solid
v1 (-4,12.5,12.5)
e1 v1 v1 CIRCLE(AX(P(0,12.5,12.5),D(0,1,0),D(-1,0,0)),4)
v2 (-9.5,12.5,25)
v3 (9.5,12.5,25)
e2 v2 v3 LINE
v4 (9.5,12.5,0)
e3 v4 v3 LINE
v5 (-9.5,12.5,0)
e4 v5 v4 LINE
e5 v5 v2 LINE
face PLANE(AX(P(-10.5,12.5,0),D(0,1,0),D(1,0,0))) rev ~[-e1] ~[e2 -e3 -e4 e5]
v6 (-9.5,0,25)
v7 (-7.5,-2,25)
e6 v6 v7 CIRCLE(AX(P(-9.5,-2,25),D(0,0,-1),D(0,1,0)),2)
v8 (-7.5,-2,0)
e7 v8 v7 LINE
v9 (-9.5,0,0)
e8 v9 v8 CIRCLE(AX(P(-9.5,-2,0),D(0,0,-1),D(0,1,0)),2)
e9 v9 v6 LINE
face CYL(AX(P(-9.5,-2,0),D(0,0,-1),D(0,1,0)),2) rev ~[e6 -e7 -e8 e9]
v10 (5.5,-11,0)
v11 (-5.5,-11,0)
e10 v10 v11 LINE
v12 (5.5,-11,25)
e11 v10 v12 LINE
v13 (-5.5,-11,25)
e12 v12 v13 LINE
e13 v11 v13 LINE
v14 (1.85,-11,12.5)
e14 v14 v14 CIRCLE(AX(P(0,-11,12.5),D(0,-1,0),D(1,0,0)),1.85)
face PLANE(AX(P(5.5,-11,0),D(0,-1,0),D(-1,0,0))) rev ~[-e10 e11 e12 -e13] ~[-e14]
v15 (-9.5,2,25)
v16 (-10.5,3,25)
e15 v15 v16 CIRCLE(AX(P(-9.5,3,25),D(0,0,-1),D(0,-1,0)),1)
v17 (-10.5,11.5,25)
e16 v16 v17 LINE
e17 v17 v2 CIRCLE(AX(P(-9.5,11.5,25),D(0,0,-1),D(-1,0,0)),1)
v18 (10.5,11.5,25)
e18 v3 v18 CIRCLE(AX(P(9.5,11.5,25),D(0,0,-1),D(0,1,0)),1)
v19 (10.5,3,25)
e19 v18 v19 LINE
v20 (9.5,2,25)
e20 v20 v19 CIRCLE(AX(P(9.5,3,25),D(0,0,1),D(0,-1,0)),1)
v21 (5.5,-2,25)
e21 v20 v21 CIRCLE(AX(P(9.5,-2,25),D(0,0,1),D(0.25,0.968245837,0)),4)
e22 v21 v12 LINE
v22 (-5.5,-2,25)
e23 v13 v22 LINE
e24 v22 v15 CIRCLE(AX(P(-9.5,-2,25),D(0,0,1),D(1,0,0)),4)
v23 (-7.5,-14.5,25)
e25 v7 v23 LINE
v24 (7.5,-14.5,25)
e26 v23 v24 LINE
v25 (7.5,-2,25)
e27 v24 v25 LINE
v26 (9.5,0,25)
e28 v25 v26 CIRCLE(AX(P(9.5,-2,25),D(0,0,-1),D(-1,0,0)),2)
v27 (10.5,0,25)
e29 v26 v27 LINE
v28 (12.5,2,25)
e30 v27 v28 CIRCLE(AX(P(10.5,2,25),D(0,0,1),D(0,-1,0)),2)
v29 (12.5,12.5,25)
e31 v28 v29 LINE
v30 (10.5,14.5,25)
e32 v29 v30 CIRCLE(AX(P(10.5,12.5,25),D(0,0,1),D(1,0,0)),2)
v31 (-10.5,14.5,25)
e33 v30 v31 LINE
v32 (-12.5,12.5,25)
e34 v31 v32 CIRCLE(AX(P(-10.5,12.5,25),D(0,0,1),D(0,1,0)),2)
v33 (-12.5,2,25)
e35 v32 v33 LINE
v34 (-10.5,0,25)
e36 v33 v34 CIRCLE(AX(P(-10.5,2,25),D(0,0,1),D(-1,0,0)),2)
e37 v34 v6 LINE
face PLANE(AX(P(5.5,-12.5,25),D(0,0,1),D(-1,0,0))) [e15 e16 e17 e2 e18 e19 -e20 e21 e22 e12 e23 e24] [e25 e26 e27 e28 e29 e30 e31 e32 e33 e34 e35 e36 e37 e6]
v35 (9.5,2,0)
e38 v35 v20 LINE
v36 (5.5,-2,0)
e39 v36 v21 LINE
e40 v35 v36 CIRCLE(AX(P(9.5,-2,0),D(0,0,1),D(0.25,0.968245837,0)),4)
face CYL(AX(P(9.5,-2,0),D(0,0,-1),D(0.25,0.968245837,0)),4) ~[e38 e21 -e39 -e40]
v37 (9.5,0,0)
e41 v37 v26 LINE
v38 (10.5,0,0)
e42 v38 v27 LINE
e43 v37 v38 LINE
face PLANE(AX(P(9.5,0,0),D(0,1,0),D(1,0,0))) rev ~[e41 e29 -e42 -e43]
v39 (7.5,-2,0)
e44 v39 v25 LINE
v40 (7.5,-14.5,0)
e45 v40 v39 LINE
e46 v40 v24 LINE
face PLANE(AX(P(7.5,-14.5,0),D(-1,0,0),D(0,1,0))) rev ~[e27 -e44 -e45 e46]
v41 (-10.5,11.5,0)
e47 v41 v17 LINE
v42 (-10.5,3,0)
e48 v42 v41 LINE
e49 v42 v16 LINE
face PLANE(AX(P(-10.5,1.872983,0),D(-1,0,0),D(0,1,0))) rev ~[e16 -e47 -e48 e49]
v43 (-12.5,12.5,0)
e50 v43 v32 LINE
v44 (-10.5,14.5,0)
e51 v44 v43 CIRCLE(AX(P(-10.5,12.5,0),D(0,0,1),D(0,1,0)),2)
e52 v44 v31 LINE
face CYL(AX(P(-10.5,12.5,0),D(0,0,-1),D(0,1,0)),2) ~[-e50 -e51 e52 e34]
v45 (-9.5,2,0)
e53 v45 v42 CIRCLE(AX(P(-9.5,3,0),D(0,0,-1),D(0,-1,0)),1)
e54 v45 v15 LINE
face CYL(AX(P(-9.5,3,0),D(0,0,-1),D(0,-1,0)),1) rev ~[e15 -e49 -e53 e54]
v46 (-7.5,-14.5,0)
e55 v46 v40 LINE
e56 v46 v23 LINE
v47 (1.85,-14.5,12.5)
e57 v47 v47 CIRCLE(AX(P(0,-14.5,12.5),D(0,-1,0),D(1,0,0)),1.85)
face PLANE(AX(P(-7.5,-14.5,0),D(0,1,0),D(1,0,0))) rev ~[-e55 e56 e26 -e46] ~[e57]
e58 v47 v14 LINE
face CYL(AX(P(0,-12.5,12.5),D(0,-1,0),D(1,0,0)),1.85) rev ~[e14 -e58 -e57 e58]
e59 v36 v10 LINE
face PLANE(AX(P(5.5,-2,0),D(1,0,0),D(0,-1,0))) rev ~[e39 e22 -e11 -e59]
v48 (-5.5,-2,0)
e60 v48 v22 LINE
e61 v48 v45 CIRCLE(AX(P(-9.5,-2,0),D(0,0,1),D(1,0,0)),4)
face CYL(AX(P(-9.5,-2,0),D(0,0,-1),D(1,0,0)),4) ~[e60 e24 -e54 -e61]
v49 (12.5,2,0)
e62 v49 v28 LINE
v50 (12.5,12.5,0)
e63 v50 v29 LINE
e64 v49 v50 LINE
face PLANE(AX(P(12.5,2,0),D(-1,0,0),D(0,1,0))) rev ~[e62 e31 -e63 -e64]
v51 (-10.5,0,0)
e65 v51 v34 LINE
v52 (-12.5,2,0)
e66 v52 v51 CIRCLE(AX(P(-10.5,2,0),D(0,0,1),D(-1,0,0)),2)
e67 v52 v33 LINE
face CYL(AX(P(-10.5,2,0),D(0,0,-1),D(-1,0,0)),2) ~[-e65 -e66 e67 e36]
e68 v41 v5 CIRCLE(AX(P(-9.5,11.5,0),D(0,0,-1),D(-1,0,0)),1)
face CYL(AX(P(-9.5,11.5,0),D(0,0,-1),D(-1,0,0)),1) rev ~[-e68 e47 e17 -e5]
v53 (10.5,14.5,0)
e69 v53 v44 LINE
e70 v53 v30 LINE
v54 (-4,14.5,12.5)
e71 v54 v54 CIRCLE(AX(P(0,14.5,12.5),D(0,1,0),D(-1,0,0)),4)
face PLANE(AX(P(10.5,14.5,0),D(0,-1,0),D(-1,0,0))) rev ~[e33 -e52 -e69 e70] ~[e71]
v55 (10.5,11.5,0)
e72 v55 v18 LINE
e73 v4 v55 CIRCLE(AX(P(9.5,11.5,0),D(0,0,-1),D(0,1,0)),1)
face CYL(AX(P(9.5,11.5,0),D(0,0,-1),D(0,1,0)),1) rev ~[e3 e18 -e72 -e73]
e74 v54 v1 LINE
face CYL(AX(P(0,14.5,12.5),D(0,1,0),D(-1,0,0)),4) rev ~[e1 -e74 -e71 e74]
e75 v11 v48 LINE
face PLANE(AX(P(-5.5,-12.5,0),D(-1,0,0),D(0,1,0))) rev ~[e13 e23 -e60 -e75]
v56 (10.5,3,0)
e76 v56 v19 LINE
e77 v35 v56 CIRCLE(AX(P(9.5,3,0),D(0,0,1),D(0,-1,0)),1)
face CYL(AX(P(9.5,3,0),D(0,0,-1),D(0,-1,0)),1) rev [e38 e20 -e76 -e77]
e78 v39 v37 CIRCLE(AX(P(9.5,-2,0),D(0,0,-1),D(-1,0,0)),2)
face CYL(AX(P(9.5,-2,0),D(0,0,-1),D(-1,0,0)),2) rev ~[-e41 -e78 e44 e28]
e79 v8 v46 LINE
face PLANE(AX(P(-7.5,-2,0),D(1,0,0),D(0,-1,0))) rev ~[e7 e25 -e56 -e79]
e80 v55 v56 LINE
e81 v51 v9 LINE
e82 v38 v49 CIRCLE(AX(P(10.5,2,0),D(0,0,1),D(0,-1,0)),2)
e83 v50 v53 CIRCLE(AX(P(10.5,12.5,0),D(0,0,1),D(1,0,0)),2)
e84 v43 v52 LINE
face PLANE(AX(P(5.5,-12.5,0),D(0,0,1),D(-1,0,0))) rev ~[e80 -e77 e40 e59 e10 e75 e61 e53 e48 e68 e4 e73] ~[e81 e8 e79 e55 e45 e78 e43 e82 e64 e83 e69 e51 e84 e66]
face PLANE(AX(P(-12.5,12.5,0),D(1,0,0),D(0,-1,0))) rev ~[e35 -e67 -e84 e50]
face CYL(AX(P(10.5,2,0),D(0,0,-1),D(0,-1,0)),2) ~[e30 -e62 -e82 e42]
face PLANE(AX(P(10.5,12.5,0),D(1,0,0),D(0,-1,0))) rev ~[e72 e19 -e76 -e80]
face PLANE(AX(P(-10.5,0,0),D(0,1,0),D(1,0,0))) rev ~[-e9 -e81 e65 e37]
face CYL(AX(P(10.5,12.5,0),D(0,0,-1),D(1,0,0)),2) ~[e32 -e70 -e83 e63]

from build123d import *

# Parameters (mm, degrees)
F1_DEPTH    = 25
F2_R        = 1.85
F3_DEPTH    = 16.3
F4_T1_DEPTH = 25
F7_R        = 4
F5_DEPTH    = 8.1194955856
F6_DEPTH    = 1.5


# Not quite as in the source:
# - a fillet or chamfer that OpenCascade refuses, or shapes differently, is made with other operations: its cross-section is extruded or revolved along the edge and cut away or added


with BuildPart() as f1:
    # F0 (on Top) → F1 (new body)
    with BuildSketch(Plane.XY):
        with BuildLine():
            Line((-7.5, -2), (-7.5, -14.5))
            Line((-7.5, -14.5), (7.5, -14.5))
            Line((7.5, -14.5), (7.5, -2))
            ThreePointArc((7.5, -2), (8.0857864376, -0.5857864376), (9.5, 0))
            Line((9.5, 0), (10.5, 0))
            ThreePointArc((10.5, 0), (11.9142135624, 0.5857864376), (12.5, 2))
            Line((12.5, 2), (12.5, 12.5))
            ThreePointArc((12.5, 12.5), (11.9142135624, 13.9142135624), (10.5, 14.5))
            Line((10.5, 14.5), (-10.5, 14.5))
            ThreePointArc((-10.5, 14.5), (-11.9142135624, 13.9142135624), (-12.5, 12.5))
            Line((-12.5, 12.5), (-12.5, 2))
            ThreePointArc((-12.5, 2), (-11.9142135624, 0.5857864376), (-10.5, 0))
            Line((-10.5, 0), (-9.5, 0))
            ThreePointArc((-9.5, 0), (-8.0857864376, -0.5857864376), (-7.5, -2))
        make_face()
        with BuildLine():
            Line((-10.5, 1.8729833462), (-10.5, 12.5))
            Line((-10.5, 12.5), (10.5, 12.5))
            Line((10.5, 12.5), (10.5, 1.8729833462))
            ThreePointArc((10.5, 1.8729833462), (7.0505102572, 1.1622776602), (5.5, -2))
            Line((5.5, -2), (5.5, -12.5))
            Line((5.5, -12.5), (-5.5, -12.5))
            Line((-5.5, -12.5), (-5.5, -2))
            ThreePointArc((-5.5, -2), (-7.0505102572, 1.1622776602), (-10.5, 1.8729833462))
        make_face(mode=Mode.SUBTRACT)
    extrude(amount=F1_DEPTH)

    # F2 (on face) → F3 (cut)
    with BuildSketch(Plane.XZ.offset(14.5)):
        with Locations((0, 12.5)):
            Circle(F2_R)
    extrude(amount=-F3_DEPTH, mode=Mode.SUBTRACT)

    # F4: fillet of radius 1 on 4 edges, made by hand

    # F4_s2 → F4_t1 (join)
    with BuildSketch(Plane.XY):
        with BuildLine():
            ThreePointArc((-10.5, 11.5), (-10.2071067812, 12.2071067812), (-9.5, 12.5))
            Line((-9.5, 12.5), (-10.5, 12.5))
            Line((-10.5, 12.5), (-10.5, 11.5))
        make_face()
        with BuildLine():
            ThreePointArc((9.5, 12.5), (10.2071067812, 12.2071067812), (10.5, 11.5))
            Line((10.5, 11.5), (10.5, 12.5))
            Line((10.5, 12.5), (9.5, 12.5))
        make_face()
        with BuildLine():
            ThreePointArc((9.5, 2), (10.2071067812, 2.2928932188), (10.5, 3))
            Line((10.5, 3), (10.5, 1.8729833462))
            ThreePointArc((10.5, 1.8729833462), (10.0040171699, 1.9681187851), (9.5, 2))
        make_face()
        with BuildLine():
            ThreePointArc((-9.5, 2), (-10.2071067812, 2.2928932188), (-10.5, 3))
            Line((-10.5, 3), (-10.5, 1.8729833462))
            ThreePointArc((-10.5, 1.8729833462), (-10.0040171699, 1.9681187851), (-9.5, 2))
        make_face()
    extrude(amount=F4_T1_DEPTH)

    # F7 (on face) → F5 (cut)
    with BuildSketch(Plane(origin=(0, 14.5, 0), x_dir=(-1, 0, 0), z_dir=(0, 1, 0))):
        with Locations((0, 12.5)):
            Circle(F7_R)
    extrude(amount=-F5_DEPTH, mode=Mode.SUBTRACT)

    # F6 (add): a face of the model
    f6_faces = [f1.faces().sort_by_distance(p)[0] for p in [
        (5.2268699943, -12.5, 12.5),
    ]]
    extrude(f6_faces, amount=F6_DEPTH)


solid = f1.part
